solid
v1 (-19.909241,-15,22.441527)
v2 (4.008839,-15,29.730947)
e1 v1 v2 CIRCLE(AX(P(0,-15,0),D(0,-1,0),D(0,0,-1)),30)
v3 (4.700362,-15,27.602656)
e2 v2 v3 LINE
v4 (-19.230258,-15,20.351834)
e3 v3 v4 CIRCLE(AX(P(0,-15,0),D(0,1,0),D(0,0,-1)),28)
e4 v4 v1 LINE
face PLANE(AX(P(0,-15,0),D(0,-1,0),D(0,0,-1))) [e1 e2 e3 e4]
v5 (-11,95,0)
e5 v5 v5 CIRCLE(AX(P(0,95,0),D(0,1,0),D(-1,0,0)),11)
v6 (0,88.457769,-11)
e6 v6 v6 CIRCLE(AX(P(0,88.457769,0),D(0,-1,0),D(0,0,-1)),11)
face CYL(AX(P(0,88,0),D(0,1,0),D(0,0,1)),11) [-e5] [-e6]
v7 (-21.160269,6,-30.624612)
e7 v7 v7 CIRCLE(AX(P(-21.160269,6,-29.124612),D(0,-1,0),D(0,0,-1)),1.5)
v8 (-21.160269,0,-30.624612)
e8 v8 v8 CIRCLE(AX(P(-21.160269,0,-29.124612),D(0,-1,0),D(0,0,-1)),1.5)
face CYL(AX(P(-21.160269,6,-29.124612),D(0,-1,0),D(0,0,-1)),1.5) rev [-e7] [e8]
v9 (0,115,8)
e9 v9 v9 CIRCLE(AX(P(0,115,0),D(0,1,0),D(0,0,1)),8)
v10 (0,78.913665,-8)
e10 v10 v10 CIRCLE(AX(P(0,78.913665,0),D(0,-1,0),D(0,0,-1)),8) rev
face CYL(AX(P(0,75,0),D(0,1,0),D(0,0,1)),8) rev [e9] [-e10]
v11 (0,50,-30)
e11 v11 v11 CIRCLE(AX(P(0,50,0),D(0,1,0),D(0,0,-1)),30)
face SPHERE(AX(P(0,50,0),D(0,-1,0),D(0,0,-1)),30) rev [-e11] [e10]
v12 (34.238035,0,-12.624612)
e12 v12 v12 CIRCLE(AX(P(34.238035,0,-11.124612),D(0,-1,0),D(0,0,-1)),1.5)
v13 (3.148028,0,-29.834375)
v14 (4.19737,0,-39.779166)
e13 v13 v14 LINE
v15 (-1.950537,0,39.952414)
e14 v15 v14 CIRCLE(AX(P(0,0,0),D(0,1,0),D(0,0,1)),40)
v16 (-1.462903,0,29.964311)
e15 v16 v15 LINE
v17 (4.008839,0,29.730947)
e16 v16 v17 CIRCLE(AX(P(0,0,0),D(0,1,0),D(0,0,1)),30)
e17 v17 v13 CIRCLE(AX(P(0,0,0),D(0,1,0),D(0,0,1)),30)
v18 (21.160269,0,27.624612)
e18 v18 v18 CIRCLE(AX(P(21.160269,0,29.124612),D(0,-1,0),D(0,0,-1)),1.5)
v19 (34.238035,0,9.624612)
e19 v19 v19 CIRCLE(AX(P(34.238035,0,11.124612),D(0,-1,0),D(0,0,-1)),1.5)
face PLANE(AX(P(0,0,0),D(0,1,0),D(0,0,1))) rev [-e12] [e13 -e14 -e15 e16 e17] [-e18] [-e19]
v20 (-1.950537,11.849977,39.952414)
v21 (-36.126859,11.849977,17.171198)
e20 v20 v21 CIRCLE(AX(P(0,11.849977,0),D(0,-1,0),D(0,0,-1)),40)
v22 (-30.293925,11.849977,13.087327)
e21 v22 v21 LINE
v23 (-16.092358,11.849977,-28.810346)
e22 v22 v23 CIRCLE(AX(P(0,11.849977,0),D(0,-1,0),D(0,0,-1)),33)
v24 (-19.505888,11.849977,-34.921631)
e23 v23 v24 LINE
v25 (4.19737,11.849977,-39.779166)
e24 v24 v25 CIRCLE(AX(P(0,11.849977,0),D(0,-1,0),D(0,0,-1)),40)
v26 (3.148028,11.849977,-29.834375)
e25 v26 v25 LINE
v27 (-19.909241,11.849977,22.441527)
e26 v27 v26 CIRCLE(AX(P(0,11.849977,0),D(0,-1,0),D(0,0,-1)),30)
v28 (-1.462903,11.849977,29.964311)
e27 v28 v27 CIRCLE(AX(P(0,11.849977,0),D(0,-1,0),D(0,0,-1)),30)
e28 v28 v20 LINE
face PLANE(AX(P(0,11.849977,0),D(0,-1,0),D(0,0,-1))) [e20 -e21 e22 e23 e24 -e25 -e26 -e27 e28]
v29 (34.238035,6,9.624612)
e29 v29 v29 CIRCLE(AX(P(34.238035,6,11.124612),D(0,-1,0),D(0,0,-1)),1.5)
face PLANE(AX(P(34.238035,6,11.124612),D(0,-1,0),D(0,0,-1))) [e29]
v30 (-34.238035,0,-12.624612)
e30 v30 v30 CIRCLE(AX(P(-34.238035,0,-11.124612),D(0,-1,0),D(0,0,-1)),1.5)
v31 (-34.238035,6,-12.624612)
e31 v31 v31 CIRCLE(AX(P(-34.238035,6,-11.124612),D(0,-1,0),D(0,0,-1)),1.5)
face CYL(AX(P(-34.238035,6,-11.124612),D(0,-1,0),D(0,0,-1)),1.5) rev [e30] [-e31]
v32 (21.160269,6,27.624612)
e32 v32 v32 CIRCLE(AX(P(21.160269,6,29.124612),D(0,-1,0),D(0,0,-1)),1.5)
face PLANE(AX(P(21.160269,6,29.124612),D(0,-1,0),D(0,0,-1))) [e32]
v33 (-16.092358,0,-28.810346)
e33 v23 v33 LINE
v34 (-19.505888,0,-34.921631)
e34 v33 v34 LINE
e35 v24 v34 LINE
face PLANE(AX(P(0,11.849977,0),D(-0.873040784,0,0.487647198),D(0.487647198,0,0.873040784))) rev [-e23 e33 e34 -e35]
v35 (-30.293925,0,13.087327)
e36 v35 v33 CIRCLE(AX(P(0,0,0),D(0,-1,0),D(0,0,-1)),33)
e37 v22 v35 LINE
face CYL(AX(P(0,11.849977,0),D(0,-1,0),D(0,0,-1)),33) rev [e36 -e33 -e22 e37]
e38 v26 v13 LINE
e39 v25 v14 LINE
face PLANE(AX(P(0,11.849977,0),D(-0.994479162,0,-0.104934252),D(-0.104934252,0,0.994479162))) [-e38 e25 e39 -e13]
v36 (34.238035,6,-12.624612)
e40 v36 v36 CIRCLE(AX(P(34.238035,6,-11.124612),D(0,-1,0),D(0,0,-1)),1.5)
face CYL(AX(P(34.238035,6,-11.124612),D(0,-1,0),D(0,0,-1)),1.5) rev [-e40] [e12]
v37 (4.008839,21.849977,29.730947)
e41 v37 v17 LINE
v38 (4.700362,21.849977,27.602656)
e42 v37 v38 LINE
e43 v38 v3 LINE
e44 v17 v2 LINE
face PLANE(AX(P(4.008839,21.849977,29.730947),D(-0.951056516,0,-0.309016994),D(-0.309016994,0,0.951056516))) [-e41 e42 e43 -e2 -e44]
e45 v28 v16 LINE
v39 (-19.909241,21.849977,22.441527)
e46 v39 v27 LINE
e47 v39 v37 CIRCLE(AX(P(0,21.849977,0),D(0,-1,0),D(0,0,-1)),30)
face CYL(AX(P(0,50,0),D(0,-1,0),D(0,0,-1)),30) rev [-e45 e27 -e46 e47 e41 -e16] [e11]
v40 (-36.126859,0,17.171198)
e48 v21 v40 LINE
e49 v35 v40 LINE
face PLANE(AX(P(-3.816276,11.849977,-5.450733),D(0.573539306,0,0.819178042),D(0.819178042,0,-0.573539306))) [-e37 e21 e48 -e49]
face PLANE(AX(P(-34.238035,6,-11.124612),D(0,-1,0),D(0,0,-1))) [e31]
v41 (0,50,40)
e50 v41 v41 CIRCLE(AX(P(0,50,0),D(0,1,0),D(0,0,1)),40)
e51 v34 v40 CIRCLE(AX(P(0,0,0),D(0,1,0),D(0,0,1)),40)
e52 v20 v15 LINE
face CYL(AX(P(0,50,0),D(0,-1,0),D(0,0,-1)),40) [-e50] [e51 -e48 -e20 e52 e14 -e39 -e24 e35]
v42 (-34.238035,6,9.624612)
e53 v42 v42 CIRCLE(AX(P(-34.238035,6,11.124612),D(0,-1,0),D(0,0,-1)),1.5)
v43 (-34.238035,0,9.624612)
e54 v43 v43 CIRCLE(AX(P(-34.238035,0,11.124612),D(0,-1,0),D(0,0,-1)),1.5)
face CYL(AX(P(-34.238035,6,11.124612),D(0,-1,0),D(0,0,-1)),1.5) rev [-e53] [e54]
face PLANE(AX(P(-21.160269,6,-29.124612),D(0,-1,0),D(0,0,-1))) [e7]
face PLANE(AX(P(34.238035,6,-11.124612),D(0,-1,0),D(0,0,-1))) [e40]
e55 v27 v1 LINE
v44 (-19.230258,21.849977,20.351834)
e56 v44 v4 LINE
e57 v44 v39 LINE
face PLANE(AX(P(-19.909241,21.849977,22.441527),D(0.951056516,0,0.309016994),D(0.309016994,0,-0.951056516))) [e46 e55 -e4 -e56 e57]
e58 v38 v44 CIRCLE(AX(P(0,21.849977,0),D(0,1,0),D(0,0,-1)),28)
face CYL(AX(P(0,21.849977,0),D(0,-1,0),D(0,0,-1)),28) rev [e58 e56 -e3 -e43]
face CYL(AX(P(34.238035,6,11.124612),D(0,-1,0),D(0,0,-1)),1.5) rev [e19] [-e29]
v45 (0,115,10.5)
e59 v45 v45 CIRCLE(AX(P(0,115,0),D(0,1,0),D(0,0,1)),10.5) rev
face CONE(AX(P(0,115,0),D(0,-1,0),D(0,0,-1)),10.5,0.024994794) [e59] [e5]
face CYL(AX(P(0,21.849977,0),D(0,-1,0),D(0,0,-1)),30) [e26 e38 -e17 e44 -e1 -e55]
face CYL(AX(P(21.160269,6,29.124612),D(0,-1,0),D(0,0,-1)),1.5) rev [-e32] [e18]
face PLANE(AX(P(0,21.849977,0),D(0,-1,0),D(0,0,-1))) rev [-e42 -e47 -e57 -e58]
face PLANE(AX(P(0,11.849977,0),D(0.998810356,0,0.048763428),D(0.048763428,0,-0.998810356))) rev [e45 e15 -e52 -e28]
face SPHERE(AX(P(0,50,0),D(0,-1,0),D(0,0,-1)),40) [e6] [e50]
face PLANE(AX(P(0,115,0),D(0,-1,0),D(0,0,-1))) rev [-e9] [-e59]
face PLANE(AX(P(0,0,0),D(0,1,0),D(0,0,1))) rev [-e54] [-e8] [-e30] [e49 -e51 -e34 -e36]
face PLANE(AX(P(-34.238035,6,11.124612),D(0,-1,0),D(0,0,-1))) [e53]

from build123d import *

# Parameters (mm, degrees)
ESBO_O1_R                     = 40
ESBO_O1_R_2                   = 30
RESSALTO_EXTRUS_O1_DEPTH      = 50
ESBO_O2_R                     = 1.5
CORTE_EXTRUS_O1_DEPTH         = 6
CORTE_EXTRUS_O2_DEPTH         = 11.84997677
RESSALTO_EXTRUS_O2_DEPTH      = 26.84997677
RESSALTO_EXTRUS_O2_DEPTH_BACK = 10
REVOLU_O1_ANGLE               = 180
RESSALTO_EXTRUS_O5_DEPTH      = 5
RESSALTO_EXTRUS_O5_DEPTH_BACK = 2
ESBO_O10_R                    = 11
ESBO_O13_R                    = 8
CORTE_EXTRUS_O4_DEPTH         = 40


# Read off the part's stored shape, not the designer's step: Limites1
with BuildPart() as part:
    # Esboço1 → Ressalto-extrusão1 (new body)
    with BuildSketch(Plane(origin=(0, 0, 0), x_dir=(1, 0, 0), z_dir=(0, 1, 0))):
        with Locations(Location((0, 0, 0), (0, 0, 270))):
            Circle(ESBO_O1_R)
        with Locations(Location((0, 0, 0), (0, 0, 270))):
            Circle(ESBO_O1_R_2, mode=Mode.SUBTRACT)
    extrude(amount=RESSALTO_EXTRUS_O1_DEPTH)

    # Esboço2 → Corte-extrusão1 (cut)
    with BuildSketch(Plane(origin=(0, 0, 0), x_dir=(-1, 0, 0), z_dir=(0, -1, 0))):
        with Locations(Location((-21.160269083, -29.124611797, 0), (0, 0, 90))):
            Circle(ESBO_O2_R)
        with Locations(Location((-34.238034587, -11.124611797, 0), (0, 0, 90))):
            Circle(ESBO_O2_R)
        with Locations(Location((-34.238034587, 11.124611797, 0), (0, 0, 90))):
            Circle(ESBO_O2_R)
        with Locations(Location((21.160269083, 29.124611797, 0), (0, 0, 90))):
            Circle(ESBO_O2_R)
        with Locations(Location((34.238034587, 11.124611797, 0), (0, 0, 90))):
            Circle(ESBO_O2_R)
        with Locations(Location((34.238034587, -11.124611797, 0), (0, 0, 90))):
            Circle(ESBO_O2_R)
    extrude(amount=-CORTE_EXTRUS_O1_DEPTH, mode=Mode.SUBTRACT)

    # Esboço3 → Corte-extrusão2 (cut)
    with BuildSketch(Plane(origin=(0, 0, 0), x_dir=(-1, 0, 0), z_dir=(0, -1, 0))):
        with BuildLine():
            ThreePointArc((30.293924668, -13.087327008), (31.253408489, 10.593604572), (16.092357529, 28.81034587))
            Line((16.092357529, 28.81034587), (19.505887914, 34.921631358))
            ThreePointArc((19.505887914, 34.921631358), (8.030354378, 39.185627576), (-4.197370073, 39.779166463))
            Line((-4.197370073, 39.779166463), (-3.148027555, 29.834374847))
            ThreePointArc((-3.148027555, 29.834374847), (29.911212101, 2.306380417), (1.462902849, -29.964310692))
            Line((1.462902849, -29.964310692), (1.950537132, -39.952414256))
            ThreePointArc((1.950537132, -39.952414256), (22.185986252, -33.283359416), (36.126859334, -17.171197823))
            Line((36.126859334, -17.171197823), (30.293924668, -13.087327008))
        make_face()
    extrude(amount=-CORTE_EXTRUS_O2_DEPTH, mode=Mode.SUBTRACT)

    # Esboço4 → Ressalto-extrusão2 (add, two sides: drawn at the far end of the back side and taken through both)
    with BuildSketch(Plane(origin=(0, 11.84997677, 0), x_dir=(-1, 0, 0), z_dir=(0, -1, 0)).offset(-RESSALTO_EXTRUS_O2_DEPTH_BACK)):
        with BuildLine():
            Line((-4.008838629, -29.730947056), (-4.700362463, -27.602655537))
            ThreePointArc((-4.700362463, -27.602655537), (-8.119302432, 26.79695744), (19.230258499, -20.351834268))
            Line((19.230258499, -20.351834268), (19.909240802, -22.441526924))
            ThreePointArc((19.909240802, -22.441526924), (-8.745833796, 28.696870757), (-4.008838629, -29.730947056))
        make_face()
    extrude(amount=RESSALTO_EXTRUS_O2_DEPTH + RESSALTO_EXTRUS_O2_DEPTH_BACK)

    # Esboço9 → Revolução1 (revolve)
    with BuildSketch(Plane(origin=(0, 50, 0), x_dir=(1, 0, 0), z_dir=(0, 1, 0))):
        with BuildLine():
            Line((-40, 0), (-30, 0))
            ThreePointArc((-30, 0), (0, 30), (30, 0))
            Line((30, 0), (40, 0))
            ThreePointArc((40, 0), (0, 40), (-40, 0))
        make_face()
    revolve(axis=Axis((-40, 50, 0), (1, 0, 0)), revolution_arc=REVOLU_O1_ANGLE)

    # Esboço10 → Ressalto-extrusão5 (add, two sides: drawn at the far end of the back side and taken through both)
    with BuildSketch(Plane(origin=(0, 90, 0), x_dir=(1, 0, 0), z_dir=(0, 1, 0)).offset(-RESSALTO_EXTRUS_O5_DEPTH_BACK)):
        with Locations(Location((0, 0, 0), (0, 0, 270))):
            Circle(ESBO_O10_R)
    extrude(amount=RESSALTO_EXTRUS_O5_DEPTH + RESSALTO_EXTRUS_O5_DEPTH_BACK)

    # Limites1 outline → Limites1 (revolve)
    with BuildSketch(Plane.XY):
        Polygon((11, 95), (10.5, 115), (0, 115), (0, 95), align=None)
    revolve(axis=Axis((0, 0, 0), (0, 1, 0)))

    # Esboço13 → Corte-extrusão4 (cut)
    with BuildSketch(Plane(origin=(0, 115, 0), x_dir=(1, 0, 0), z_dir=(0, 1, 0))):
        with Locations(Location((0, 0, 0), (0, 0, 270))):
            Circle(ESBO_O13_R)
    extrude(amount=-CORTE_EXTRUS_O4_DEPTH, mode=Mode.SUBTRACT)


solid = part.part
